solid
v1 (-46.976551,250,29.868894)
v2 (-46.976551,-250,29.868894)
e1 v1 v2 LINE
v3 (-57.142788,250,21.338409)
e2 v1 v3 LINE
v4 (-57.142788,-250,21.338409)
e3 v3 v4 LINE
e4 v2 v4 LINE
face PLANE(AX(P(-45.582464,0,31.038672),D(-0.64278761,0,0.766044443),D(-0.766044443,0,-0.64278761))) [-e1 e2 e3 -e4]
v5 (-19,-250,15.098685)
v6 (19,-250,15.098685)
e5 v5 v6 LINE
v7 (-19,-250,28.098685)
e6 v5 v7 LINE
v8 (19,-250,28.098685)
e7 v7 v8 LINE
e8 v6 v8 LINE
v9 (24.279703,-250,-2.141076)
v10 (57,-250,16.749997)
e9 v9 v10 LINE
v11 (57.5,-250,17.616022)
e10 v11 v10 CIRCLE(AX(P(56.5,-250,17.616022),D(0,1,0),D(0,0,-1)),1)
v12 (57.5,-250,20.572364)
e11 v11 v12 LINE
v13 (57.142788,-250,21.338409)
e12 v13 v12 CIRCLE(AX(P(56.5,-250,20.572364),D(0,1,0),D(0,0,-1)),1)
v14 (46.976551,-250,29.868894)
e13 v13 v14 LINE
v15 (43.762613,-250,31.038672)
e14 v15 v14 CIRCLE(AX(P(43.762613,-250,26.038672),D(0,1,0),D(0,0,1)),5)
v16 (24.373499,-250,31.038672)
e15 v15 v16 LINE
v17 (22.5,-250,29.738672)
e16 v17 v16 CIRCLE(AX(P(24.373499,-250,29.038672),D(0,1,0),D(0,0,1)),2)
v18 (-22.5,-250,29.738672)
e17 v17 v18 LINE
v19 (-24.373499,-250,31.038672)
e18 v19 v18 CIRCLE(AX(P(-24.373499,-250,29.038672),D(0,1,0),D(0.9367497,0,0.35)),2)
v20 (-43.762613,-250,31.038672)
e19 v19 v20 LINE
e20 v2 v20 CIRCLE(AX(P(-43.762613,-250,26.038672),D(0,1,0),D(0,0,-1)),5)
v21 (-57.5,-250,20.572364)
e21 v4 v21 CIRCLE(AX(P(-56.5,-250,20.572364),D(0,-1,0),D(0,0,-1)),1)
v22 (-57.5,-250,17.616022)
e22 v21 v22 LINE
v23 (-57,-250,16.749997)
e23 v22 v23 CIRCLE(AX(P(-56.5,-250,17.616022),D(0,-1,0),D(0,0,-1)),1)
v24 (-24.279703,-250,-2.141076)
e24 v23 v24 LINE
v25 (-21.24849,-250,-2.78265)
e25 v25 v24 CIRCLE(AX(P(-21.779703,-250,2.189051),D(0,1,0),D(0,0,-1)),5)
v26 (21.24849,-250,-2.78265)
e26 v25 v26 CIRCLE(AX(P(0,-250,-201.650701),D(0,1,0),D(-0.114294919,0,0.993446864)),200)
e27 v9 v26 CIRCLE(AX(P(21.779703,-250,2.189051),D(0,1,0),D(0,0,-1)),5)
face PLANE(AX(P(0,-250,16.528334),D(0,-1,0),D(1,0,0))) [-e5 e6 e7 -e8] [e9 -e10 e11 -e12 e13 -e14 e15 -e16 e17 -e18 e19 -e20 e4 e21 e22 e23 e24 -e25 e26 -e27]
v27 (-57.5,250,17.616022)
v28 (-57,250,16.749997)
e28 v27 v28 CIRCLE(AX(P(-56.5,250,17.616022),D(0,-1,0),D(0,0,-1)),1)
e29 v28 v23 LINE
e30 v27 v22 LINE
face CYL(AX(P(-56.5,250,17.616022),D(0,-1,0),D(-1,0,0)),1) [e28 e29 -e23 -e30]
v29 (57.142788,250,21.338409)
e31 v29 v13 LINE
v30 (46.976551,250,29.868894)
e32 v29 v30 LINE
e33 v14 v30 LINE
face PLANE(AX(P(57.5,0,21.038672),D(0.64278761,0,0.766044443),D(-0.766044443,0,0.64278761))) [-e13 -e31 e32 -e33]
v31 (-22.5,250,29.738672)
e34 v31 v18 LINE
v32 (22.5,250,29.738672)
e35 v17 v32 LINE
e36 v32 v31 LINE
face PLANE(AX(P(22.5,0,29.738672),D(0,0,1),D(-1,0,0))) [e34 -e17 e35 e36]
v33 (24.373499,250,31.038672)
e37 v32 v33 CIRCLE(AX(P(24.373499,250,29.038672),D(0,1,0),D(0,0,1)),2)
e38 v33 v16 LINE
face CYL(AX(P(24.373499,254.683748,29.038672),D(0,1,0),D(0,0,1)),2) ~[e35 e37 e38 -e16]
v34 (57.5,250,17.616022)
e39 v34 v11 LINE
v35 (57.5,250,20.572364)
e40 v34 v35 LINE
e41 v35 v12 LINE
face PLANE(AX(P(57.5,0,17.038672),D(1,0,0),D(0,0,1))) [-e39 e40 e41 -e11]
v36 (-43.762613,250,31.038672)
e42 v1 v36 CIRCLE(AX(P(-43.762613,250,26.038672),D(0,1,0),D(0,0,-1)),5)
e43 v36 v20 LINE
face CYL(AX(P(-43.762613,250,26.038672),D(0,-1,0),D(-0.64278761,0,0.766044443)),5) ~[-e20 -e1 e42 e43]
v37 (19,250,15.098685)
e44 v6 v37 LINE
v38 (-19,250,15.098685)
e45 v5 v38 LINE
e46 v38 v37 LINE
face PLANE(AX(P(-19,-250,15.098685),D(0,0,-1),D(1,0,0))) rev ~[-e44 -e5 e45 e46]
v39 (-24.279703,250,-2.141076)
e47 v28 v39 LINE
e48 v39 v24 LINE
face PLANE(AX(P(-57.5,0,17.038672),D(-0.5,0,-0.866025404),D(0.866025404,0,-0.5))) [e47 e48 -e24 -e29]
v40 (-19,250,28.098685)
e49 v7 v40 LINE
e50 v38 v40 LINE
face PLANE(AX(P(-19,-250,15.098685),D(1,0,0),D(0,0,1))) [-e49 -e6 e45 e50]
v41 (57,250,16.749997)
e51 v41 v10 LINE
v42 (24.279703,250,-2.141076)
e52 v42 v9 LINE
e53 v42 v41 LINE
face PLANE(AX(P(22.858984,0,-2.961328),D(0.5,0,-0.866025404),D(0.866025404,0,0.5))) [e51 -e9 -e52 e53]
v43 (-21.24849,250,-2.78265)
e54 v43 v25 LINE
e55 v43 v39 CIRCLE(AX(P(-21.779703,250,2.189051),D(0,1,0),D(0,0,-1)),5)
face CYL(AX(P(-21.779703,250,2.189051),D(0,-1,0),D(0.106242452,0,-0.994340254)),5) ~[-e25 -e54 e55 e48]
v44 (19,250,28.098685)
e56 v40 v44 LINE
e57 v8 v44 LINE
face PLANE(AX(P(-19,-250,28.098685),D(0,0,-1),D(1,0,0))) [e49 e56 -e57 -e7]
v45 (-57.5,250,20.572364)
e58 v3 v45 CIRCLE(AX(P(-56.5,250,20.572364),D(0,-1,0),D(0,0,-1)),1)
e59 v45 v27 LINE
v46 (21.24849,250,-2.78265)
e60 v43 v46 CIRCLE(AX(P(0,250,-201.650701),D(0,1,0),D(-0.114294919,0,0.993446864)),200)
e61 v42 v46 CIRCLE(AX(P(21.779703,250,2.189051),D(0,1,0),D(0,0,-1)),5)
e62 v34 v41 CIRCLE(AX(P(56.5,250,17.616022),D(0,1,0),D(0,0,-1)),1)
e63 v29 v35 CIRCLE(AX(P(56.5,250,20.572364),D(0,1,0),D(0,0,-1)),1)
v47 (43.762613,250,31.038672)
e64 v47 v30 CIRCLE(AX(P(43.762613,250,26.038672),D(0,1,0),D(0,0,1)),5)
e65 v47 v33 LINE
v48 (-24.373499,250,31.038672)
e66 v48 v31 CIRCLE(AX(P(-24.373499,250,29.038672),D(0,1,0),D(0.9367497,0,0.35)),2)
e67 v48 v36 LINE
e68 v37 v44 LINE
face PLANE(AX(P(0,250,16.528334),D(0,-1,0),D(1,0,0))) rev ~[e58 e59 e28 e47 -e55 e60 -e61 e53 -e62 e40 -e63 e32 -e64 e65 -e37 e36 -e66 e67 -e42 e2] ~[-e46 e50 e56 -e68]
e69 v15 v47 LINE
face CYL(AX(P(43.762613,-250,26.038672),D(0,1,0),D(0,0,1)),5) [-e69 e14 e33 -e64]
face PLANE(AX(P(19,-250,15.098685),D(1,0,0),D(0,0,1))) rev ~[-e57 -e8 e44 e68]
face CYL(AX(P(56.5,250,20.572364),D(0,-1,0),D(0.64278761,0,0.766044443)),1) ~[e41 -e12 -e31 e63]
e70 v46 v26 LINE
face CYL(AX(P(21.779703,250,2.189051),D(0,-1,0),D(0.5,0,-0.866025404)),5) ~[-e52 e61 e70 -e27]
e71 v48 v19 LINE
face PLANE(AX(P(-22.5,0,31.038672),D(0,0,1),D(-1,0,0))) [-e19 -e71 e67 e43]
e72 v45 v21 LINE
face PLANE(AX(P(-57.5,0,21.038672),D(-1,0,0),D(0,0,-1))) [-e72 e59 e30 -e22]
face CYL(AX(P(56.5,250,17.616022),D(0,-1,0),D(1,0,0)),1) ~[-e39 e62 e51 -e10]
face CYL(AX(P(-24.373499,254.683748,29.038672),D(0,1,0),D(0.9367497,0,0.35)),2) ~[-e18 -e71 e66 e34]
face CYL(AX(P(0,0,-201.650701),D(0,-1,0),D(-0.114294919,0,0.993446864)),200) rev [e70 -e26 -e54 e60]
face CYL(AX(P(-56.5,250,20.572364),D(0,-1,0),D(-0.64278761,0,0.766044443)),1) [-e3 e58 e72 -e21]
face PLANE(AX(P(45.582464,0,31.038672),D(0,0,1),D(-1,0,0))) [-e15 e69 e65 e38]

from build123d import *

# Parameters (mm, degrees)
F1_DEPTH    = 250
F2_R        = 5
F3_R        = 1
F4_W        = 38
F4_H        = 13
F5_DEPTH    = 500.001
F6_T1_DEPTH = 509.3674969976


# Not quite as in the source:
# - a fillet or chamfer that OpenCascade refuses, or shapes differently, is made with other operations: its cross-section is extruded or revolved along the edge and cut away or added


with BuildPart() as f1:
    # F0 (on Front) → F1 (new body, symmetric)
    with BuildSketch(Plane.XZ):
        with BuildLine():
            Line((22.5, 29.7386717319), (0, 29.7386717319))
            Line((0, 29.7386717319), (-22.5, 29.7386717319))
            Line((-22.5, 29.7386717319), (-22.5, 31.0386717319))
            Line((-22.5, 31.0386717319), (-45.5824640741, 31.0386717319))
            Line((-45.5824640741, 31.0386717319), (-57.5, 21.0386717319))
            Line((-57.5, 21.0386717319), (-57.5, 17.0386717319))
            Line((-57.5, 17.0386717319), (-22.8589838486, -2.9613282681))
            ThreePointArc((-22.8589838486, -2.9613282681), (0, -1.6507010523), (22.8589838486, -2.9613282681))
            Line((22.8589838486, -2.9613282681), (57.5, 17.0386717319))
            Line((57.5, 17.0386717319), (57.5, 21.0386717319))
            Line((57.5, 21.0386717319), (45.5824640741, 31.0386717319))
            Line((45.5824640741, 31.0386717319), (22.5, 31.0386717319))
            Line((22.5, 31.0386717319), (22.5, 29.7386717319))
        make_face()
    extrude(amount=F1_DEPTH, both=True)

    # F2
    f2_edges = [f1.edges().sort_by_distance(p)[0] for p in [
        (45.582464, 0, 31.038672),
        (22.858984, 0, -2.961328),
        (-45.582464, 0, 31.038672),
        (-22.858984, 0, -2.961328),
    ]]
    fillet(f2_edges, radius=F2_R)

    # F3
    f3_edges = [f1.edges().sort_by_distance(p)[0] for p in [
        (57.5, 0, 21.038672),
        (57.5, 0, 17.038672),
        (-57.5, 0, 21.038672),
        (-57.5, 0, 17.038672),
    ]]
    fillet(f3_edges, radius=F3_R)

    # F4 (on face) → F5 (cut, through all)
    with BuildSketch(Plane.XZ.offset(250)):
        with Locations((0, 21.5986846235)):
            Rectangle(F4_W, F4_H)
    extrude(amount=-F5_DEPTH, mode=Mode.SUBTRACT)

    # F6: fillet of radius 2 on 2 edges, made by hand

    # F6_s2 → F6_t1 (cut)
    with BuildSketch(Plane.XZ.offset(-254.6837484988)):
        with BuildLine():
            ThreePointArc((-22.5, 29.7386717319), (-23.2333239744, 30.6818394045), (-24.3734993995, 31.0386717319))
            Line((-24.3734993995, 31.0386717319), (-22.5, 31.0386717319))
            Line((-22.5, 31.0386717319), (-22.5, 29.7386717319))
        make_face()
        with BuildLine():
            ThreePointArc((24.3734993995, 31.0386717319), (23.2333239744, 30.6818394045), (22.5, 29.7386717319))
            Line((22.5, 29.7386717319), (22.5, 31.0386717319))
            Line((22.5, 31.0386717319), (24.3734993995, 31.0386717319))
        make_face()
    extrude(amount=F6_T1_DEPTH, mode=Mode.SUBTRACT)


solid = f1.part
